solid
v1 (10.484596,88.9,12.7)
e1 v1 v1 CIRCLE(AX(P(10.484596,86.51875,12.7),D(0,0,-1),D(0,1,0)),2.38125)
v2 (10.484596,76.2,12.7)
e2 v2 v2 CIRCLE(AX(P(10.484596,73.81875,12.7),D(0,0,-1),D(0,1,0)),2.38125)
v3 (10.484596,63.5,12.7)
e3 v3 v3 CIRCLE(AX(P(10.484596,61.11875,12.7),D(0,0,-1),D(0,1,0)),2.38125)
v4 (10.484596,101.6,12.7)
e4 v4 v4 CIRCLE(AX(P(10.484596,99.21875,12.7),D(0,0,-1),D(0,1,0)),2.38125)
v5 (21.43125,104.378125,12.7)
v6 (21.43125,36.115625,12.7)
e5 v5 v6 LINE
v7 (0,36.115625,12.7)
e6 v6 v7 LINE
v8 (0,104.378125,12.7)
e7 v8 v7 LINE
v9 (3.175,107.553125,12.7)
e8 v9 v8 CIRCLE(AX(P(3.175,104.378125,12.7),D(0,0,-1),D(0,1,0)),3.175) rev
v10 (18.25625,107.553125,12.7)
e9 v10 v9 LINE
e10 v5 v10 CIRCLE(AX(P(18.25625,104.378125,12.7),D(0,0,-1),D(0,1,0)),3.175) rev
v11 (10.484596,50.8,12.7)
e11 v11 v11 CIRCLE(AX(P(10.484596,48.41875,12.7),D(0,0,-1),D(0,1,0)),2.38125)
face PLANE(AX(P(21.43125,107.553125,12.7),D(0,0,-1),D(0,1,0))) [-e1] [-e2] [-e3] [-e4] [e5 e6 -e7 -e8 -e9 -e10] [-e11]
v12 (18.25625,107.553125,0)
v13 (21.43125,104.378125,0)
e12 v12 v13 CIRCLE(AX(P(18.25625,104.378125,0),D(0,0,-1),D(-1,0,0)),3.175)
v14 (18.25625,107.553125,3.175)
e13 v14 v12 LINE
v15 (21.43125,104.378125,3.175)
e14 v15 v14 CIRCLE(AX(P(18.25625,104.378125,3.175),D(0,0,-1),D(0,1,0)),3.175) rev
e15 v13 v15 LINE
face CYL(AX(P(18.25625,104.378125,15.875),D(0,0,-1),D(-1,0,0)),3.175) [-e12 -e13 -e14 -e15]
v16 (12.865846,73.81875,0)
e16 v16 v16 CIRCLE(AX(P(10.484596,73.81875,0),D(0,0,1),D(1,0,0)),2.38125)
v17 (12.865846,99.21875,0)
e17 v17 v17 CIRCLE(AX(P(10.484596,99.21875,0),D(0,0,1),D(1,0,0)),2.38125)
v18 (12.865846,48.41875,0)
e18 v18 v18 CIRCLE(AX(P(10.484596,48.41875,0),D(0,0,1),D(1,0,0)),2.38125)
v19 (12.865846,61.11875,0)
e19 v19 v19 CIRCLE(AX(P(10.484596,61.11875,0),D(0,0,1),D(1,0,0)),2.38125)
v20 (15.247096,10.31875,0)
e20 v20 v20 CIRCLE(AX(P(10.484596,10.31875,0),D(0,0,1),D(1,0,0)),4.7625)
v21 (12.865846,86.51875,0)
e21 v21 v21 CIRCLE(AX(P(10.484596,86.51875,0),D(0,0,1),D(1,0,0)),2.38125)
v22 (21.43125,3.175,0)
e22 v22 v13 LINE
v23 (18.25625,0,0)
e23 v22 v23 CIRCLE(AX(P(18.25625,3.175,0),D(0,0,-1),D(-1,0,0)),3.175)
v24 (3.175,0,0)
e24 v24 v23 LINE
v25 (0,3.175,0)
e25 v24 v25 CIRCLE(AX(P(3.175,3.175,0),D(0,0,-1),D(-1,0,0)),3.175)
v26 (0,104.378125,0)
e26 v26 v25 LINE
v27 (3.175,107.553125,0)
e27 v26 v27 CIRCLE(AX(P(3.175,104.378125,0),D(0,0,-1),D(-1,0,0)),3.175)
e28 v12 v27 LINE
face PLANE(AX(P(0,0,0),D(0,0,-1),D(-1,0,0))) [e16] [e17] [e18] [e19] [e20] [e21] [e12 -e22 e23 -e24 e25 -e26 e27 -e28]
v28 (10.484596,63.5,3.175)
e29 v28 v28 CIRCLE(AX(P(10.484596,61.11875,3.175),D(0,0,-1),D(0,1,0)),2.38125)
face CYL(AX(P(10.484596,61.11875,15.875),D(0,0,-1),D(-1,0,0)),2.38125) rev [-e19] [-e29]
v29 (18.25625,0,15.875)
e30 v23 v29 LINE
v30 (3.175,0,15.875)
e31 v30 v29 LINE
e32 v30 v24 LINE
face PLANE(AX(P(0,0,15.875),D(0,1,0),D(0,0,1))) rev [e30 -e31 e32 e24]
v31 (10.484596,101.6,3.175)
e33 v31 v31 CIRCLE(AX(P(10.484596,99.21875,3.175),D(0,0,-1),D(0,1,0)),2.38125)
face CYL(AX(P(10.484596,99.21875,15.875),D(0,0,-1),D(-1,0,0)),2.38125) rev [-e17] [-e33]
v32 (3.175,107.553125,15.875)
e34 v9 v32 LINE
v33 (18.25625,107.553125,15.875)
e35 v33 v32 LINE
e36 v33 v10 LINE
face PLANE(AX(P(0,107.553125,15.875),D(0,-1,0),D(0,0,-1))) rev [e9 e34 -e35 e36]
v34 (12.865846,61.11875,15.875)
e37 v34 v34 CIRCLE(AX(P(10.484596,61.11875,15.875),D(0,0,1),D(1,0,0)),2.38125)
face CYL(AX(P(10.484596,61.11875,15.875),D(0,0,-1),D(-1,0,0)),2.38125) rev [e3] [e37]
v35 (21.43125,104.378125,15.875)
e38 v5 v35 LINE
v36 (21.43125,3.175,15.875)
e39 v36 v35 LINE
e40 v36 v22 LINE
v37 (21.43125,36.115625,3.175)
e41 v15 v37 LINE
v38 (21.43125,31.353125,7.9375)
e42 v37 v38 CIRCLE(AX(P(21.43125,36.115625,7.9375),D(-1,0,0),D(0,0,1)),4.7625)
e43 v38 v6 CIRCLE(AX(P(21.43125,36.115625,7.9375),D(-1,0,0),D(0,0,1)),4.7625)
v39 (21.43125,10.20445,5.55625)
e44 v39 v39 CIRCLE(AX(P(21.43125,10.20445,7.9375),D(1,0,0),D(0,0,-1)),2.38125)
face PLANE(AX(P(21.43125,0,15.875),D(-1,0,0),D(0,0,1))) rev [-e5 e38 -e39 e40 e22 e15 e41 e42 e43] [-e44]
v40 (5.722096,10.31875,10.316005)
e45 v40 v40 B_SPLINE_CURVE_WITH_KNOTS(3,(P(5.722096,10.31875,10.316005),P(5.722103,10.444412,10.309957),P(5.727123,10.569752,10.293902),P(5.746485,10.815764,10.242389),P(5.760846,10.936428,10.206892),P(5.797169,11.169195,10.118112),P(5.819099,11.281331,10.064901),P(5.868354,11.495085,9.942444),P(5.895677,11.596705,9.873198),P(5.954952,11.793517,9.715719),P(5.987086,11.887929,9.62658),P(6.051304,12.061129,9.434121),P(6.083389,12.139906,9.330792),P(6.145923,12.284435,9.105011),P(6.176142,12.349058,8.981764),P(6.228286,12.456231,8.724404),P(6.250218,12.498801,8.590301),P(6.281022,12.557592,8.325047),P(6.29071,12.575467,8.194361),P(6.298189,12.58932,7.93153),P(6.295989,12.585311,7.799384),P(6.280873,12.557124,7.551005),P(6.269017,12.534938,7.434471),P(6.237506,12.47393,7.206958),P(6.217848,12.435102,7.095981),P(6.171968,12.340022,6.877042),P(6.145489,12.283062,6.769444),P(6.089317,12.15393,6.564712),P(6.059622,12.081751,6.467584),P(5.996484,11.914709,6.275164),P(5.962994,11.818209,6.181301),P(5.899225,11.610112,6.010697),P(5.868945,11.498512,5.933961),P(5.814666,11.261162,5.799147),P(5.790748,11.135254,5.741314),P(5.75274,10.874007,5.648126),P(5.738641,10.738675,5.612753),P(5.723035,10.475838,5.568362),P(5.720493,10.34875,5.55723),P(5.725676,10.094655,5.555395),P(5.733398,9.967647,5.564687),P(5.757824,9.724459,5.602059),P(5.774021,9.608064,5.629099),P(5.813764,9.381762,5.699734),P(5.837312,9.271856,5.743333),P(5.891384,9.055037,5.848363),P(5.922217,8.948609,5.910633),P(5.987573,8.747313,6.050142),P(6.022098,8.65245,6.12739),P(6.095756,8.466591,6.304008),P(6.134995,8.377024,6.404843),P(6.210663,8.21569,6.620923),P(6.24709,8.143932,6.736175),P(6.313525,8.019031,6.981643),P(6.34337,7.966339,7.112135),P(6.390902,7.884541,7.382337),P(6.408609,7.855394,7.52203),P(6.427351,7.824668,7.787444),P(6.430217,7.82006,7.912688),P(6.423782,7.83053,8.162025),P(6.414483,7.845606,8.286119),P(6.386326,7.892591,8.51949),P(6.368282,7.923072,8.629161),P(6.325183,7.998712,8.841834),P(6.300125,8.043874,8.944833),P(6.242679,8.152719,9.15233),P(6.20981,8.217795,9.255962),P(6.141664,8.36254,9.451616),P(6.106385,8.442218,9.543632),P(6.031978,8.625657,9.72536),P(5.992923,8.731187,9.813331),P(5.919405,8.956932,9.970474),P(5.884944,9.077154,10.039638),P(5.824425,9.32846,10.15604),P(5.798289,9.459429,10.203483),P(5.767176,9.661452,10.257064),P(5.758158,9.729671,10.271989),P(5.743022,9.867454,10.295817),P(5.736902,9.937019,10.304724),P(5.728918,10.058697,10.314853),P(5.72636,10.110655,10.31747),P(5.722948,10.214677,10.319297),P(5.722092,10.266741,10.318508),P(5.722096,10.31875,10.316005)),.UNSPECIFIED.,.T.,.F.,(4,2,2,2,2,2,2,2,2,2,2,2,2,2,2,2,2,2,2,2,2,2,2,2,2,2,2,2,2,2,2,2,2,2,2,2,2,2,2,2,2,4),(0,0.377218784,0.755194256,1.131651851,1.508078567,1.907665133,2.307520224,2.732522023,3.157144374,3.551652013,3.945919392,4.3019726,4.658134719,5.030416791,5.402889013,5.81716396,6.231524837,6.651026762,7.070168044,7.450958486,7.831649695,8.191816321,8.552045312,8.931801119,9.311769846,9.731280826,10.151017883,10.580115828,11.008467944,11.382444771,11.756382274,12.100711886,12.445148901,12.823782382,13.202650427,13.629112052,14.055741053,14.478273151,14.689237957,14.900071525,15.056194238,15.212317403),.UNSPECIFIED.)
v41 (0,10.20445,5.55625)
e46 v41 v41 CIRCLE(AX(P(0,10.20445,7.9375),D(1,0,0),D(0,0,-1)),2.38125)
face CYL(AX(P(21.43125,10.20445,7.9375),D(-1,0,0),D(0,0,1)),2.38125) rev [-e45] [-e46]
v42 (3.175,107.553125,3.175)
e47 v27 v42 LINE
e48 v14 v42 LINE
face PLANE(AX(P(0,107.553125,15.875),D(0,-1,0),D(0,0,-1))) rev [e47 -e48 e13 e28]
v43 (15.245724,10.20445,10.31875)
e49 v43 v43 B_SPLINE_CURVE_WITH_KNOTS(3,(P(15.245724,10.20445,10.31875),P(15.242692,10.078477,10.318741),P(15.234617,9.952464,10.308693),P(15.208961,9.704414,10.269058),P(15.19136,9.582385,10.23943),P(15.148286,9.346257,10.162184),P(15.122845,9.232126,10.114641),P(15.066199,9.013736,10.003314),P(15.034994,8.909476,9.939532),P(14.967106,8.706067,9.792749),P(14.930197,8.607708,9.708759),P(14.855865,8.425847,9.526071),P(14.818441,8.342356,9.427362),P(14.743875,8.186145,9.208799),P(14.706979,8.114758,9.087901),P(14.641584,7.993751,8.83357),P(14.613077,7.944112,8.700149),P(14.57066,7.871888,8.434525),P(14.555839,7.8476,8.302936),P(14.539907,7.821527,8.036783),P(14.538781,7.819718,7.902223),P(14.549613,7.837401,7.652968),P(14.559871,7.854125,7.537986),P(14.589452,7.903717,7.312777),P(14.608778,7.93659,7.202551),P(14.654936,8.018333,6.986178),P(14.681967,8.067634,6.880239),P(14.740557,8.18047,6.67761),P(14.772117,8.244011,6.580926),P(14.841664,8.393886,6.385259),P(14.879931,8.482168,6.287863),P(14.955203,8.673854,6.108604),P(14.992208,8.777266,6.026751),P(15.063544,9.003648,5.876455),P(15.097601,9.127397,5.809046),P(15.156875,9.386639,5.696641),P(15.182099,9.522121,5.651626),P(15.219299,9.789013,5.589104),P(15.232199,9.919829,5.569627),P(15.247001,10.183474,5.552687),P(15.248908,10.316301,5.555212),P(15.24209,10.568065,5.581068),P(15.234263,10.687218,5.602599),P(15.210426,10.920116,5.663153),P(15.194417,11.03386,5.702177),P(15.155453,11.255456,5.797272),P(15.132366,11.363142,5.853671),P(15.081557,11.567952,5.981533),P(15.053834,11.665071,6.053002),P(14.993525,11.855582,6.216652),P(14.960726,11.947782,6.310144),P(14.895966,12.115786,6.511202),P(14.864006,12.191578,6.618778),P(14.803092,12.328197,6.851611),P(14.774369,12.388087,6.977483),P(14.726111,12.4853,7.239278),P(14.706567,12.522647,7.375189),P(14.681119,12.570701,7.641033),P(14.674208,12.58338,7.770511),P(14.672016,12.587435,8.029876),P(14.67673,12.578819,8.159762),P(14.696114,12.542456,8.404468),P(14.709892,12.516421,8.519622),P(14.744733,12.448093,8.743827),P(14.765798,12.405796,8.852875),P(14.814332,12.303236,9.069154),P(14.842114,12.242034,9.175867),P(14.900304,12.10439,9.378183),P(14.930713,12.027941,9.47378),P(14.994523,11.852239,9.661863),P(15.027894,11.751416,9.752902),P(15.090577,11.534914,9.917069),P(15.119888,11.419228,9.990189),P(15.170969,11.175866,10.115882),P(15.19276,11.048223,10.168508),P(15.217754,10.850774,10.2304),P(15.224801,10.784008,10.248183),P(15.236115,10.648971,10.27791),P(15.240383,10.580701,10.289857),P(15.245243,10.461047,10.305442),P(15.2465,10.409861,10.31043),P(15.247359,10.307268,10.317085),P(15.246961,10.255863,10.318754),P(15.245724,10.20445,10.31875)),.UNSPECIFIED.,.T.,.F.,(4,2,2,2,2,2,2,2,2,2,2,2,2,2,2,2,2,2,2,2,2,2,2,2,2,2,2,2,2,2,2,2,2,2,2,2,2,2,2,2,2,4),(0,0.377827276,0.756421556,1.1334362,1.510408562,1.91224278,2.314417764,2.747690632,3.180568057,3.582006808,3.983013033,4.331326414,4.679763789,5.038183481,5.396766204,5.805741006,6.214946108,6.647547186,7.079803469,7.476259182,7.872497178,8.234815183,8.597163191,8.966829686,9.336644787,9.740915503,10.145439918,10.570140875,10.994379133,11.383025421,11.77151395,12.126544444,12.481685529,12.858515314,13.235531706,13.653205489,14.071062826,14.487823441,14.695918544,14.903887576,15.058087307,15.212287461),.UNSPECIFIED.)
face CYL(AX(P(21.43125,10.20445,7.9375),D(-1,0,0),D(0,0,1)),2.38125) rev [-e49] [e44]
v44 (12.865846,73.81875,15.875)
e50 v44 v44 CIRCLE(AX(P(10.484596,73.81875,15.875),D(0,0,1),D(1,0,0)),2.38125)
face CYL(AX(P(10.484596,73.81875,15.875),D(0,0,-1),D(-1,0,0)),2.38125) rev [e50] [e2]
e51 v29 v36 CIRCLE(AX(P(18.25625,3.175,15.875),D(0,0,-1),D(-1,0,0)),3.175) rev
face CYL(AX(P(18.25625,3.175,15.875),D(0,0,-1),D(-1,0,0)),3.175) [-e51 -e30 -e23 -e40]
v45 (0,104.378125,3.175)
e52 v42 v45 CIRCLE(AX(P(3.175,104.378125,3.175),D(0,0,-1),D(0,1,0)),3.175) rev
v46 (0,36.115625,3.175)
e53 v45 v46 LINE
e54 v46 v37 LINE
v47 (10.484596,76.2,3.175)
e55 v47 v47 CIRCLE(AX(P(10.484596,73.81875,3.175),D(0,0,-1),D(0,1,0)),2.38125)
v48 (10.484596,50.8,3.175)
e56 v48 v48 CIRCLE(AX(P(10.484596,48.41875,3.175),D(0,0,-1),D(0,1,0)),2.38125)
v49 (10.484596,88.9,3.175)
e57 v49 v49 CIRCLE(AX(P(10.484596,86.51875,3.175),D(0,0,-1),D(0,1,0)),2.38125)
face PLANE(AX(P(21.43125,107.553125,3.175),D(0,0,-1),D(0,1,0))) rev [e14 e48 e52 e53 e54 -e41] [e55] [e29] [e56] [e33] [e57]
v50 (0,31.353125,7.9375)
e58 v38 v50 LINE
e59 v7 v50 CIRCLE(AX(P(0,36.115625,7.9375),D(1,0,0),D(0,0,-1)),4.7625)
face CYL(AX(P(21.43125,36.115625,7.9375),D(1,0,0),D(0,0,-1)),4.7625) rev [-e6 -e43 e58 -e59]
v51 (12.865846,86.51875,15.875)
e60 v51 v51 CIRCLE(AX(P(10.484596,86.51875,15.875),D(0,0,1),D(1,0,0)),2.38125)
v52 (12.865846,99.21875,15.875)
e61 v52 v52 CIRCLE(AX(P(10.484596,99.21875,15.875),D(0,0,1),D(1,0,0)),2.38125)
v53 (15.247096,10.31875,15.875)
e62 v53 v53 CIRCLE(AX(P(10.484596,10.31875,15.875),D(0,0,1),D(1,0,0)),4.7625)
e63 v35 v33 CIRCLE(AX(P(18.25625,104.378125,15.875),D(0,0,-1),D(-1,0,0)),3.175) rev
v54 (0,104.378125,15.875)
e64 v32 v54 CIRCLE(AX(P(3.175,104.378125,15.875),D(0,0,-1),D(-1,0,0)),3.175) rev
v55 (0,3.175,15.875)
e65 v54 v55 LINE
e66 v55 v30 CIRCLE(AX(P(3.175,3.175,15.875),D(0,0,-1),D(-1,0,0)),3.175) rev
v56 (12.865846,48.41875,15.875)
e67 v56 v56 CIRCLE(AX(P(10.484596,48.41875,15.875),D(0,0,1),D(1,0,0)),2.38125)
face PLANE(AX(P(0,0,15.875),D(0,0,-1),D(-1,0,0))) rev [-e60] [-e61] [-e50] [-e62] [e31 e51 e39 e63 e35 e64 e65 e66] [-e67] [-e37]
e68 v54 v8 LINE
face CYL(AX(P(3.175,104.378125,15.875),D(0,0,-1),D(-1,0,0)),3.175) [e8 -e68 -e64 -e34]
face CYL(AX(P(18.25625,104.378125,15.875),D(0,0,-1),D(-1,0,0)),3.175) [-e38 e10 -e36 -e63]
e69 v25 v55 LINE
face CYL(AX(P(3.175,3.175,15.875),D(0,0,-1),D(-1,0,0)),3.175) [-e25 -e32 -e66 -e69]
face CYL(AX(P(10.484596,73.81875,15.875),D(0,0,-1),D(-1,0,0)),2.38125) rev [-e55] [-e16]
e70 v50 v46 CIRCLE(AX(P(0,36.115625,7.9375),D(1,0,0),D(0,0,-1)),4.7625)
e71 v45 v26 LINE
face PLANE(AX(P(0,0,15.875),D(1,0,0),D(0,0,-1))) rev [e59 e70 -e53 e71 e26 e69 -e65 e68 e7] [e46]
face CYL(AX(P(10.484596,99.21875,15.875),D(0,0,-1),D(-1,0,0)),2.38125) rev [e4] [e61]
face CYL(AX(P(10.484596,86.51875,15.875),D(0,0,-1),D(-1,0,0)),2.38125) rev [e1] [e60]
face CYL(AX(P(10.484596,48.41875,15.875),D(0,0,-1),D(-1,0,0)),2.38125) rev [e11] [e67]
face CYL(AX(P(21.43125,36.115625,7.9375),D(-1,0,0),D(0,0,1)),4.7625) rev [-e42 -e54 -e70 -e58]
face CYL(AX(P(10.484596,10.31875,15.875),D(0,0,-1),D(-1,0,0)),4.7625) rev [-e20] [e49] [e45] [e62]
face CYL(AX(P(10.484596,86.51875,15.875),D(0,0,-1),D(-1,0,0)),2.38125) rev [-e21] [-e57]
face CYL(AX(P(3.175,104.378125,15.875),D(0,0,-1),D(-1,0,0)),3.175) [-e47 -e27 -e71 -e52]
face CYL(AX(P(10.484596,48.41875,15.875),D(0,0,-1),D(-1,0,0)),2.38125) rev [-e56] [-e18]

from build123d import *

# Parameters (mm, degrees)
SKETCH1_W           = 21.43125
SKETCH1_H           = 107.553125
SKETCH1_R           = 4.7625
SKETCH1_R_2         = 2.38125
BOSS_EXTRUDE3_DEPTH = 15.875
FILLET1_R           = 3.175
FILLET2_R           = 3.175
FILLET3_R           = 3.175
FILLET4_R           = 3.175
SKETCH3_W           = 9.525
SKETCH3_H           = 76.2
CUT_EXTRUDE2_DEPTH  = 111.810598766
FILLET5_R           = 4.7625
FILLET6_R           = 4.7625
SKETCH5_R           = 2.38125
CUT_EXTRUDE3_DEPTH  = 21.43125


with BuildPart() as part:
    # Sketch1 → Boss-Extrude3 (new body)
    with BuildSketch(Plane.XY):
        with Locations((10.715625, 53.7765625)):
            Rectangle(SKETCH1_W, SKETCH1_H)
        with Locations((10.484595663, 10.31875)):
            Circle(SKETCH1_R, mode=Mode.SUBTRACT)
        with Locations((10.484595663, 99.21875)):
            Circle(SKETCH1_R_2, mode=Mode.SUBTRACT)
        with Locations((10.484595663, 86.51875)):
            Circle(SKETCH1_R_2, mode=Mode.SUBTRACT)
        with Locations((10.484595663, 73.81875)):
            Circle(SKETCH1_R_2, mode=Mode.SUBTRACT)
        with Locations((10.484595663, 61.11875)):
            Circle(SKETCH1_R_2, mode=Mode.SUBTRACT)
        with Locations((10.484595663, 48.41875)):
            Circle(SKETCH1_R_2, mode=Mode.SUBTRACT)
    extrude(amount=BOSS_EXTRUDE3_DEPTH)

    # Fillet1
    fillet1_edges = [part.edges().sort_by_distance(p)[0] for p in [
        (21.43125, 0, 7.9375),
    ]]
    fillet(fillet1_edges, radius=FILLET1_R)

    # Fillet2
    fillet2_edges = [part.edges().sort_by_distance(p)[0] for p in [
        (0, 0, 7.9375),
    ]]
    fillet(fillet2_edges, radius=FILLET2_R)

    # Fillet3
    fillet3_edges = [part.edges().sort_by_distance(p)[0] for p in [
        (21.43125, 107.553125, 7.9375),
    ]]
    fillet(fillet3_edges, radius=FILLET3_R)

    # Fillet4
    fillet4_edges = [part.edges().sort_by_distance(p)[0] for p in [
        (0, 107.553125, 7.9375),
    ]]
    fillet(fillet4_edges, radius=FILLET4_R)

    # Sketch3 → Cut-Extrude2 (cut, through all)
    with BuildSketch(Plane(origin=(0, 0, 0), x_dir=(0, 0, -1), z_dir=(1, 0, 0))):
        with Locations((-7.9375, 69.453125)):
            Rectangle(SKETCH3_W, SKETCH3_H)
    extrude(amount=CUT_EXTRUDE2_DEPTH, mode=Mode.SUBTRACT)

    # Fillet5
    fillet5_edges = [part.edges().sort_by_distance(p)[0] for p in [
        (10.715625, 31.353125, 3.175),
    ]]
    fillet(fillet5_edges, radius=FILLET5_R)

    # Fillet6
    fillet6_edges = [part.edges().sort_by_distance(p)[0] for p in [
        (10.715625, 31.353125, 12.7),
    ]]
    fillet(fillet6_edges, radius=FILLET6_R - 0.0001)  # a hair under: the kernel refuses the full size

    # Sketch5 → Cut-Extrude3 (cut)
    with BuildSketch(Plane(origin=(0, 0, 0), x_dir=(0, 0, -1), z_dir=(1, 0, 0))):
        with Locations(Location((-7.9375, 10.20445, 0), (0, 0, 180))):
            Circle(SKETCH5_R)
    extrude(amount=CUT_EXTRUDE3_DEPTH, mode=Mode.SUBTRACT)


solid = part.part
